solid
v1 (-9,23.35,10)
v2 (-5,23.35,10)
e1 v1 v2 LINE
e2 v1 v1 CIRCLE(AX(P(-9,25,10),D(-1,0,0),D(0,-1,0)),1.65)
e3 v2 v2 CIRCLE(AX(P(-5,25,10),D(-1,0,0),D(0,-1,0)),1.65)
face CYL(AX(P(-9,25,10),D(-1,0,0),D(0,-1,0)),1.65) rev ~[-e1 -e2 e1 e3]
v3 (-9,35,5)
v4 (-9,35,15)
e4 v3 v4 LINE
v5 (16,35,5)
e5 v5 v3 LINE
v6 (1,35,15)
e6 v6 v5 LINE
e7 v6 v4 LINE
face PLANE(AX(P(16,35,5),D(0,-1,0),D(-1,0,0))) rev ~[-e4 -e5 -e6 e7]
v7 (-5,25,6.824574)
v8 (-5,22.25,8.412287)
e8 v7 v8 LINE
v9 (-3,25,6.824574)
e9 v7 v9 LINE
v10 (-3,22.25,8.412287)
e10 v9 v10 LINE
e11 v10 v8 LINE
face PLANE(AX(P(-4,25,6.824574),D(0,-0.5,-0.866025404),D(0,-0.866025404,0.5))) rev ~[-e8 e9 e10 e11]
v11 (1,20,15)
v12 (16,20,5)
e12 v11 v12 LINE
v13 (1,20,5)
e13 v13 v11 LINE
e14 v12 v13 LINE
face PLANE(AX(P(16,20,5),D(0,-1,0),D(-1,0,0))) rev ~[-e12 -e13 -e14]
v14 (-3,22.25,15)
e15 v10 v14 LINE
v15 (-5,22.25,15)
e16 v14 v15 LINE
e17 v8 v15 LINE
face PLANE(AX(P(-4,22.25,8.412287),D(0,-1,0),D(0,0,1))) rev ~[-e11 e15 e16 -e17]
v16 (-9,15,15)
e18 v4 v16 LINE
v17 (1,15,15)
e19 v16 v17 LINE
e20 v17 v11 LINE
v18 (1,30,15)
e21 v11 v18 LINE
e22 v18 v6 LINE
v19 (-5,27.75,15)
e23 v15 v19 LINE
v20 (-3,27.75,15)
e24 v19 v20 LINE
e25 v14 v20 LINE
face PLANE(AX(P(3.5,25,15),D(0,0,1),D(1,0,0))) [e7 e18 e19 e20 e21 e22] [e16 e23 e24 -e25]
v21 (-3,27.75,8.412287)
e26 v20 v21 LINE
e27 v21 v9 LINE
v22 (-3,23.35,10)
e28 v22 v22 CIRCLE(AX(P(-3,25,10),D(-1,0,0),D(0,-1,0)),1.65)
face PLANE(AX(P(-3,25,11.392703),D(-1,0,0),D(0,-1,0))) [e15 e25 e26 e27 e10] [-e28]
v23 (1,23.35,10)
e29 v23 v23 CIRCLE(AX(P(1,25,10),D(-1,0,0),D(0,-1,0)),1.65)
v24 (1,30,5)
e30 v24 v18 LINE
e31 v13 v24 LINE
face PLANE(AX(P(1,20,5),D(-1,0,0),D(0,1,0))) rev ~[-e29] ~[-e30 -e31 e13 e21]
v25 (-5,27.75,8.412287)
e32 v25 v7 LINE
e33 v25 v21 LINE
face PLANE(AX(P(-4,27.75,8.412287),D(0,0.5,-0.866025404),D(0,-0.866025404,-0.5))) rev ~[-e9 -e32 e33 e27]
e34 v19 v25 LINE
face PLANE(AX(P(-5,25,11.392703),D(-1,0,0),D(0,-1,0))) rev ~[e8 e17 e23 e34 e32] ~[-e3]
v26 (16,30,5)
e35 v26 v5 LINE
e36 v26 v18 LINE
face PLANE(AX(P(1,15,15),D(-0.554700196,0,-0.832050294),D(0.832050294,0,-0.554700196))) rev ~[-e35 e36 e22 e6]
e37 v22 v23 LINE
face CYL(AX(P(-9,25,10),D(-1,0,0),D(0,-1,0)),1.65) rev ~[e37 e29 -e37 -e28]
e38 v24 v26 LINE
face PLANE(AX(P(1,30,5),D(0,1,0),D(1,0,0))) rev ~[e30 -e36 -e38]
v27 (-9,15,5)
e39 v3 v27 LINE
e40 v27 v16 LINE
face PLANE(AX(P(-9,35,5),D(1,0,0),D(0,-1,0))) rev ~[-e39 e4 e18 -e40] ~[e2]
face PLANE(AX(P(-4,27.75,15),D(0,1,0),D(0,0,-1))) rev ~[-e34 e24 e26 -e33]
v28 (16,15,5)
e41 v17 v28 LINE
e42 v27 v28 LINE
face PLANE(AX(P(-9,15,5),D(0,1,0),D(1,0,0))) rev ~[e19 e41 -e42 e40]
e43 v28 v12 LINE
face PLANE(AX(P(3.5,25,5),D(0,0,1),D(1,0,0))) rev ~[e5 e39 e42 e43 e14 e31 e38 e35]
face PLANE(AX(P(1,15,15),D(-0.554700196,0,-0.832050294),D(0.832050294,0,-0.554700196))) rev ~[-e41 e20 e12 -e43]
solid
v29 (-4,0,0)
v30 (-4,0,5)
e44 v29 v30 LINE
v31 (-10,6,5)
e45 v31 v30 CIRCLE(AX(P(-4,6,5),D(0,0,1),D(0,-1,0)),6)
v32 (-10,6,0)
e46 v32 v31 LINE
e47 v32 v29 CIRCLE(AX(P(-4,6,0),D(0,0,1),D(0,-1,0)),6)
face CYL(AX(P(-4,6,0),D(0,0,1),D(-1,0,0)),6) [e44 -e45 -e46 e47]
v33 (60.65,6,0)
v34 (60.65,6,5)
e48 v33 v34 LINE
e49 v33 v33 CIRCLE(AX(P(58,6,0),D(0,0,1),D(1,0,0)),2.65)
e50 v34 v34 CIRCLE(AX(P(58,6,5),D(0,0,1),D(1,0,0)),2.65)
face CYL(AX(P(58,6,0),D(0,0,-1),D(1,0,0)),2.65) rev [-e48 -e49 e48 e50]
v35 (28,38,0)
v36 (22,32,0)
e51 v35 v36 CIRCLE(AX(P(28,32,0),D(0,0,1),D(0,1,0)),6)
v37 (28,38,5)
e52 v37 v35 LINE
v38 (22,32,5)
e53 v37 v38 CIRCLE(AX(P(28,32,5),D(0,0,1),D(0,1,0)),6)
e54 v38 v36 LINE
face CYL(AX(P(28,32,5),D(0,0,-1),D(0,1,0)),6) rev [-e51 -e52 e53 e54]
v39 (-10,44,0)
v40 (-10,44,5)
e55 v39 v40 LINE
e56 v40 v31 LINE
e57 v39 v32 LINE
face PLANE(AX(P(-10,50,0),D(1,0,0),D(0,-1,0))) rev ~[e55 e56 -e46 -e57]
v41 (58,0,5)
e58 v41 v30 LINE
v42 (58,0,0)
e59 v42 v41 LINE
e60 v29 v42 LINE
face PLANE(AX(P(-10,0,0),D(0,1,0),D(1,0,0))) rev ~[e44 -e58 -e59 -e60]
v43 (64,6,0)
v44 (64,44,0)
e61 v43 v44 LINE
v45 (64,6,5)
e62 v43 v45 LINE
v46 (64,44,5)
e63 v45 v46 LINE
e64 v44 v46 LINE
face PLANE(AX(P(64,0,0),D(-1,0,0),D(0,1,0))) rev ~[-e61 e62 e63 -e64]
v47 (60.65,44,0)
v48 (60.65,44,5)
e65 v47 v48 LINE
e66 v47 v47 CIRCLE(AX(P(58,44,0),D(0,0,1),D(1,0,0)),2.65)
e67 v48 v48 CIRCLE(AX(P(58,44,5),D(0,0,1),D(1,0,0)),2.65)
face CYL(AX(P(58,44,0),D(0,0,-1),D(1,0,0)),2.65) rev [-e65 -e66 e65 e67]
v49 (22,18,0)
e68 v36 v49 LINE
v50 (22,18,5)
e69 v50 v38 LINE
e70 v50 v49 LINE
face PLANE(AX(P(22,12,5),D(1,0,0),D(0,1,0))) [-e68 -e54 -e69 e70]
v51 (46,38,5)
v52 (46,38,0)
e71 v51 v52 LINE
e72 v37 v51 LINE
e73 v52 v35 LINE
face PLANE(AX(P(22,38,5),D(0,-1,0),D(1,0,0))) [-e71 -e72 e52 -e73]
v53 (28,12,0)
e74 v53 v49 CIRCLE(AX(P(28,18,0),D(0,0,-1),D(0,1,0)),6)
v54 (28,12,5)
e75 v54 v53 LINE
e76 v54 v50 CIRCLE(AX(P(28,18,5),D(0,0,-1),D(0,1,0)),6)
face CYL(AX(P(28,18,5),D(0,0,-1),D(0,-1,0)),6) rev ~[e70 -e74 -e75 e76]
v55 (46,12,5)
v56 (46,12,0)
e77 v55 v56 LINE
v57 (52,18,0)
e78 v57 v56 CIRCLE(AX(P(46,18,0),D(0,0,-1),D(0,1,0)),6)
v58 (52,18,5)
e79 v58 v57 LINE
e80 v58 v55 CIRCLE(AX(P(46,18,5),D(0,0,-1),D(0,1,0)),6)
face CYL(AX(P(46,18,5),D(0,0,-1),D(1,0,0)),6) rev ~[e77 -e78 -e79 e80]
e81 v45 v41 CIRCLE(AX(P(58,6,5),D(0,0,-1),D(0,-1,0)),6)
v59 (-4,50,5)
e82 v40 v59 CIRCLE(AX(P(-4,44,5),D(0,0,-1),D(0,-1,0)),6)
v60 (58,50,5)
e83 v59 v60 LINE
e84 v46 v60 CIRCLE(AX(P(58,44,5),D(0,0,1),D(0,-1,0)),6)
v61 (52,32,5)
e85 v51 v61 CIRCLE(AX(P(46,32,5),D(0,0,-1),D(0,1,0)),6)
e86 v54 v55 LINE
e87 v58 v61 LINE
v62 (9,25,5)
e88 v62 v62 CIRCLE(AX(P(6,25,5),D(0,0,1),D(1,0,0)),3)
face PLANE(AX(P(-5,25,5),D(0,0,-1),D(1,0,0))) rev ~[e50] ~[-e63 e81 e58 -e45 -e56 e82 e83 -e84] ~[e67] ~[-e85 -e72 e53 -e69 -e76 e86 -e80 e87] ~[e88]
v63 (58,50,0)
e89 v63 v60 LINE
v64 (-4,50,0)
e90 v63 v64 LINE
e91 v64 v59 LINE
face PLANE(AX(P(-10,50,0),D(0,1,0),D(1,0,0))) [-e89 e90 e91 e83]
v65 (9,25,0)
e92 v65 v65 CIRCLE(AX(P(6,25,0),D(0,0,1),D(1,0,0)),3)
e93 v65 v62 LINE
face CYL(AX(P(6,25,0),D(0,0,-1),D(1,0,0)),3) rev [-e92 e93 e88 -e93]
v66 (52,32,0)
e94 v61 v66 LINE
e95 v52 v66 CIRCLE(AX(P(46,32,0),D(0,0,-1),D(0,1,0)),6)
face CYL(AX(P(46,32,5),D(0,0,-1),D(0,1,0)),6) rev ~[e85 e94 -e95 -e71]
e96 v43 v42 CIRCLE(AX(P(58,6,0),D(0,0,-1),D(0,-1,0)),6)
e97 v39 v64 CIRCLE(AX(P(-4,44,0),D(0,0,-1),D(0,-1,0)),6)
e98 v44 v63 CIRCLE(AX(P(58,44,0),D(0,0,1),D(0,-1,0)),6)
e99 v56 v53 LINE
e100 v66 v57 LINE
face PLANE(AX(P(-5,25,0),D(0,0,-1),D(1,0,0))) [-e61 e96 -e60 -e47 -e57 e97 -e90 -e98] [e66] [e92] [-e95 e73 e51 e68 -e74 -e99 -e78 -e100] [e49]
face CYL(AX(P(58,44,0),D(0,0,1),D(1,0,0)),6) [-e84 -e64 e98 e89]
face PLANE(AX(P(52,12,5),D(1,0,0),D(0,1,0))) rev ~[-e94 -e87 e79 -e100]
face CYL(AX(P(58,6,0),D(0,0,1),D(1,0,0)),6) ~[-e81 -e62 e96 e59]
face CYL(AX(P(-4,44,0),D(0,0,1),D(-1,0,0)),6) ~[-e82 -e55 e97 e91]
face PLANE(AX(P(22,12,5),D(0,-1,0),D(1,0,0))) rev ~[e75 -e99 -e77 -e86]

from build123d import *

# Parameters (mm, degrees)
F0_W      = 64
F0_H      = 50
F0_R      = 2.65
F0_R_2    = 3
F1_DEPTH  = 5
F2_W      = 10
F2_H      = 50
F3_DEPTH  = 5
F8_DEPTH  = 10
F10_DEPTH = 35.001
F11_R     = 1.65
F12_DEPTH = 73.001
F15_DEPTH = 1
F16_R     = 6
F17_W     = 30
F17_H     = 26
F18_DEPTH = 5.001
F19_R     = 6


# Not quite as in the source:
# - a feature names something its author has since deleted; it is built from what else it names


with BuildPart() as f1:
    # F0 (on Top) → F1 (new body)
    with BuildSketch(Plane.XY):
        with Locations((32, 25)):
            Rectangle(F0_W, F0_H)
        with Locations((58, 6)):
            Circle(F0_R, mode=Mode.SUBTRACT)
        with Locations((6, 25)):
            Circle(F0_R_2, mode=Mode.SUBTRACT)
        with Locations((58, 44)):
            Circle(F0_R, mode=Mode.SUBTRACT)
    extrude(amount=F1_DEPTH)

    # F2 (on face) → F3 (join, through all)
    with BuildSketch(Plane(origin=(0, 0, 0), x_dir=(1, 0, 0), z_dir=(0, 0, -1))):
        with Locations((-5, -25)):
            Rectangle(F2_W, F2_H)
    extrude(amount=-F3_DEPTH)

    # F16
    f16_edges = [f1.edges().sort_by_distance(p)[0] for p in [
        (64, 50, 2.5),
        (64, 0, 2.5),
        (-10, 0, 2.5),
        (-10, 50, 2.5),
    ]]
    fillet(f16_edges, radius=F16_R)

    # F17 (on face) → F18 (cut, through all)
    with BuildSketch(Plane.XY.offset(5)):
        with Locations((37, 25)):
            Rectangle(F17_W, F17_H)
    extrude(amount=-F18_DEPTH, mode=Mode.SUBTRACT)

    # F19
    f19_edges = [f1.edges().sort_by_distance(p)[0] for p in [
        (22, 38, 2.5),
        (52, 38, 2.5),
        (52, 12, 2.5),
        (22, 12, 2.5),
    ]]
    fillet(f19_edges, radius=F19_R)


with BuildPart() as f8:
    # F7 (on face) → F8 (new body)
    with BuildSketch(Plane.XY.offset(5)):
        Polygon((16, 35), (-9, 35), (-9, 15), (16, 15), (16, 20), (1, 20), (1, 30), (16, 30), align=None)
    extrude(amount=F8_DEPTH)

    # F9 (on face) → F10 (cut, through all)
    with BuildSketch(Plane.XZ.offset(-15)):
        Polygon((16, 15), (1, 15), (16, 5), align=None)
    extrude(amount=-F10_DEPTH, mode=Mode.SUBTRACT)

    # F11 (on face) → F12 (cut, through all)
    with BuildSketch(Plane(origin=(-9, 0, 0), x_dir=(0, -1, 0), z_dir=(-1, 0, 0))):
        with Locations((-25, 10)):
            Circle(F11_R)
    extrude(amount=-F12_DEPTH, mode=Mode.SUBTRACT)

    # F14 (on offset) → F15 (cut, symmetric)
    with BuildSketch(Plane(origin=(-4, 0, 0), x_dir=(0, -1, 0), z_dir=(-1, 0, 0))):
        Polygon((-25, 6.8245735195), (-22.25, 8.4122867597), (-22.25, 15), (-27.75, 15), (-27.75, 8.4122867597), align=None)
    extrude(amount=F15_DEPTH, both=True, mode=Mode.SUBTRACT)


solid = Compound([f1.part, f8.part])
